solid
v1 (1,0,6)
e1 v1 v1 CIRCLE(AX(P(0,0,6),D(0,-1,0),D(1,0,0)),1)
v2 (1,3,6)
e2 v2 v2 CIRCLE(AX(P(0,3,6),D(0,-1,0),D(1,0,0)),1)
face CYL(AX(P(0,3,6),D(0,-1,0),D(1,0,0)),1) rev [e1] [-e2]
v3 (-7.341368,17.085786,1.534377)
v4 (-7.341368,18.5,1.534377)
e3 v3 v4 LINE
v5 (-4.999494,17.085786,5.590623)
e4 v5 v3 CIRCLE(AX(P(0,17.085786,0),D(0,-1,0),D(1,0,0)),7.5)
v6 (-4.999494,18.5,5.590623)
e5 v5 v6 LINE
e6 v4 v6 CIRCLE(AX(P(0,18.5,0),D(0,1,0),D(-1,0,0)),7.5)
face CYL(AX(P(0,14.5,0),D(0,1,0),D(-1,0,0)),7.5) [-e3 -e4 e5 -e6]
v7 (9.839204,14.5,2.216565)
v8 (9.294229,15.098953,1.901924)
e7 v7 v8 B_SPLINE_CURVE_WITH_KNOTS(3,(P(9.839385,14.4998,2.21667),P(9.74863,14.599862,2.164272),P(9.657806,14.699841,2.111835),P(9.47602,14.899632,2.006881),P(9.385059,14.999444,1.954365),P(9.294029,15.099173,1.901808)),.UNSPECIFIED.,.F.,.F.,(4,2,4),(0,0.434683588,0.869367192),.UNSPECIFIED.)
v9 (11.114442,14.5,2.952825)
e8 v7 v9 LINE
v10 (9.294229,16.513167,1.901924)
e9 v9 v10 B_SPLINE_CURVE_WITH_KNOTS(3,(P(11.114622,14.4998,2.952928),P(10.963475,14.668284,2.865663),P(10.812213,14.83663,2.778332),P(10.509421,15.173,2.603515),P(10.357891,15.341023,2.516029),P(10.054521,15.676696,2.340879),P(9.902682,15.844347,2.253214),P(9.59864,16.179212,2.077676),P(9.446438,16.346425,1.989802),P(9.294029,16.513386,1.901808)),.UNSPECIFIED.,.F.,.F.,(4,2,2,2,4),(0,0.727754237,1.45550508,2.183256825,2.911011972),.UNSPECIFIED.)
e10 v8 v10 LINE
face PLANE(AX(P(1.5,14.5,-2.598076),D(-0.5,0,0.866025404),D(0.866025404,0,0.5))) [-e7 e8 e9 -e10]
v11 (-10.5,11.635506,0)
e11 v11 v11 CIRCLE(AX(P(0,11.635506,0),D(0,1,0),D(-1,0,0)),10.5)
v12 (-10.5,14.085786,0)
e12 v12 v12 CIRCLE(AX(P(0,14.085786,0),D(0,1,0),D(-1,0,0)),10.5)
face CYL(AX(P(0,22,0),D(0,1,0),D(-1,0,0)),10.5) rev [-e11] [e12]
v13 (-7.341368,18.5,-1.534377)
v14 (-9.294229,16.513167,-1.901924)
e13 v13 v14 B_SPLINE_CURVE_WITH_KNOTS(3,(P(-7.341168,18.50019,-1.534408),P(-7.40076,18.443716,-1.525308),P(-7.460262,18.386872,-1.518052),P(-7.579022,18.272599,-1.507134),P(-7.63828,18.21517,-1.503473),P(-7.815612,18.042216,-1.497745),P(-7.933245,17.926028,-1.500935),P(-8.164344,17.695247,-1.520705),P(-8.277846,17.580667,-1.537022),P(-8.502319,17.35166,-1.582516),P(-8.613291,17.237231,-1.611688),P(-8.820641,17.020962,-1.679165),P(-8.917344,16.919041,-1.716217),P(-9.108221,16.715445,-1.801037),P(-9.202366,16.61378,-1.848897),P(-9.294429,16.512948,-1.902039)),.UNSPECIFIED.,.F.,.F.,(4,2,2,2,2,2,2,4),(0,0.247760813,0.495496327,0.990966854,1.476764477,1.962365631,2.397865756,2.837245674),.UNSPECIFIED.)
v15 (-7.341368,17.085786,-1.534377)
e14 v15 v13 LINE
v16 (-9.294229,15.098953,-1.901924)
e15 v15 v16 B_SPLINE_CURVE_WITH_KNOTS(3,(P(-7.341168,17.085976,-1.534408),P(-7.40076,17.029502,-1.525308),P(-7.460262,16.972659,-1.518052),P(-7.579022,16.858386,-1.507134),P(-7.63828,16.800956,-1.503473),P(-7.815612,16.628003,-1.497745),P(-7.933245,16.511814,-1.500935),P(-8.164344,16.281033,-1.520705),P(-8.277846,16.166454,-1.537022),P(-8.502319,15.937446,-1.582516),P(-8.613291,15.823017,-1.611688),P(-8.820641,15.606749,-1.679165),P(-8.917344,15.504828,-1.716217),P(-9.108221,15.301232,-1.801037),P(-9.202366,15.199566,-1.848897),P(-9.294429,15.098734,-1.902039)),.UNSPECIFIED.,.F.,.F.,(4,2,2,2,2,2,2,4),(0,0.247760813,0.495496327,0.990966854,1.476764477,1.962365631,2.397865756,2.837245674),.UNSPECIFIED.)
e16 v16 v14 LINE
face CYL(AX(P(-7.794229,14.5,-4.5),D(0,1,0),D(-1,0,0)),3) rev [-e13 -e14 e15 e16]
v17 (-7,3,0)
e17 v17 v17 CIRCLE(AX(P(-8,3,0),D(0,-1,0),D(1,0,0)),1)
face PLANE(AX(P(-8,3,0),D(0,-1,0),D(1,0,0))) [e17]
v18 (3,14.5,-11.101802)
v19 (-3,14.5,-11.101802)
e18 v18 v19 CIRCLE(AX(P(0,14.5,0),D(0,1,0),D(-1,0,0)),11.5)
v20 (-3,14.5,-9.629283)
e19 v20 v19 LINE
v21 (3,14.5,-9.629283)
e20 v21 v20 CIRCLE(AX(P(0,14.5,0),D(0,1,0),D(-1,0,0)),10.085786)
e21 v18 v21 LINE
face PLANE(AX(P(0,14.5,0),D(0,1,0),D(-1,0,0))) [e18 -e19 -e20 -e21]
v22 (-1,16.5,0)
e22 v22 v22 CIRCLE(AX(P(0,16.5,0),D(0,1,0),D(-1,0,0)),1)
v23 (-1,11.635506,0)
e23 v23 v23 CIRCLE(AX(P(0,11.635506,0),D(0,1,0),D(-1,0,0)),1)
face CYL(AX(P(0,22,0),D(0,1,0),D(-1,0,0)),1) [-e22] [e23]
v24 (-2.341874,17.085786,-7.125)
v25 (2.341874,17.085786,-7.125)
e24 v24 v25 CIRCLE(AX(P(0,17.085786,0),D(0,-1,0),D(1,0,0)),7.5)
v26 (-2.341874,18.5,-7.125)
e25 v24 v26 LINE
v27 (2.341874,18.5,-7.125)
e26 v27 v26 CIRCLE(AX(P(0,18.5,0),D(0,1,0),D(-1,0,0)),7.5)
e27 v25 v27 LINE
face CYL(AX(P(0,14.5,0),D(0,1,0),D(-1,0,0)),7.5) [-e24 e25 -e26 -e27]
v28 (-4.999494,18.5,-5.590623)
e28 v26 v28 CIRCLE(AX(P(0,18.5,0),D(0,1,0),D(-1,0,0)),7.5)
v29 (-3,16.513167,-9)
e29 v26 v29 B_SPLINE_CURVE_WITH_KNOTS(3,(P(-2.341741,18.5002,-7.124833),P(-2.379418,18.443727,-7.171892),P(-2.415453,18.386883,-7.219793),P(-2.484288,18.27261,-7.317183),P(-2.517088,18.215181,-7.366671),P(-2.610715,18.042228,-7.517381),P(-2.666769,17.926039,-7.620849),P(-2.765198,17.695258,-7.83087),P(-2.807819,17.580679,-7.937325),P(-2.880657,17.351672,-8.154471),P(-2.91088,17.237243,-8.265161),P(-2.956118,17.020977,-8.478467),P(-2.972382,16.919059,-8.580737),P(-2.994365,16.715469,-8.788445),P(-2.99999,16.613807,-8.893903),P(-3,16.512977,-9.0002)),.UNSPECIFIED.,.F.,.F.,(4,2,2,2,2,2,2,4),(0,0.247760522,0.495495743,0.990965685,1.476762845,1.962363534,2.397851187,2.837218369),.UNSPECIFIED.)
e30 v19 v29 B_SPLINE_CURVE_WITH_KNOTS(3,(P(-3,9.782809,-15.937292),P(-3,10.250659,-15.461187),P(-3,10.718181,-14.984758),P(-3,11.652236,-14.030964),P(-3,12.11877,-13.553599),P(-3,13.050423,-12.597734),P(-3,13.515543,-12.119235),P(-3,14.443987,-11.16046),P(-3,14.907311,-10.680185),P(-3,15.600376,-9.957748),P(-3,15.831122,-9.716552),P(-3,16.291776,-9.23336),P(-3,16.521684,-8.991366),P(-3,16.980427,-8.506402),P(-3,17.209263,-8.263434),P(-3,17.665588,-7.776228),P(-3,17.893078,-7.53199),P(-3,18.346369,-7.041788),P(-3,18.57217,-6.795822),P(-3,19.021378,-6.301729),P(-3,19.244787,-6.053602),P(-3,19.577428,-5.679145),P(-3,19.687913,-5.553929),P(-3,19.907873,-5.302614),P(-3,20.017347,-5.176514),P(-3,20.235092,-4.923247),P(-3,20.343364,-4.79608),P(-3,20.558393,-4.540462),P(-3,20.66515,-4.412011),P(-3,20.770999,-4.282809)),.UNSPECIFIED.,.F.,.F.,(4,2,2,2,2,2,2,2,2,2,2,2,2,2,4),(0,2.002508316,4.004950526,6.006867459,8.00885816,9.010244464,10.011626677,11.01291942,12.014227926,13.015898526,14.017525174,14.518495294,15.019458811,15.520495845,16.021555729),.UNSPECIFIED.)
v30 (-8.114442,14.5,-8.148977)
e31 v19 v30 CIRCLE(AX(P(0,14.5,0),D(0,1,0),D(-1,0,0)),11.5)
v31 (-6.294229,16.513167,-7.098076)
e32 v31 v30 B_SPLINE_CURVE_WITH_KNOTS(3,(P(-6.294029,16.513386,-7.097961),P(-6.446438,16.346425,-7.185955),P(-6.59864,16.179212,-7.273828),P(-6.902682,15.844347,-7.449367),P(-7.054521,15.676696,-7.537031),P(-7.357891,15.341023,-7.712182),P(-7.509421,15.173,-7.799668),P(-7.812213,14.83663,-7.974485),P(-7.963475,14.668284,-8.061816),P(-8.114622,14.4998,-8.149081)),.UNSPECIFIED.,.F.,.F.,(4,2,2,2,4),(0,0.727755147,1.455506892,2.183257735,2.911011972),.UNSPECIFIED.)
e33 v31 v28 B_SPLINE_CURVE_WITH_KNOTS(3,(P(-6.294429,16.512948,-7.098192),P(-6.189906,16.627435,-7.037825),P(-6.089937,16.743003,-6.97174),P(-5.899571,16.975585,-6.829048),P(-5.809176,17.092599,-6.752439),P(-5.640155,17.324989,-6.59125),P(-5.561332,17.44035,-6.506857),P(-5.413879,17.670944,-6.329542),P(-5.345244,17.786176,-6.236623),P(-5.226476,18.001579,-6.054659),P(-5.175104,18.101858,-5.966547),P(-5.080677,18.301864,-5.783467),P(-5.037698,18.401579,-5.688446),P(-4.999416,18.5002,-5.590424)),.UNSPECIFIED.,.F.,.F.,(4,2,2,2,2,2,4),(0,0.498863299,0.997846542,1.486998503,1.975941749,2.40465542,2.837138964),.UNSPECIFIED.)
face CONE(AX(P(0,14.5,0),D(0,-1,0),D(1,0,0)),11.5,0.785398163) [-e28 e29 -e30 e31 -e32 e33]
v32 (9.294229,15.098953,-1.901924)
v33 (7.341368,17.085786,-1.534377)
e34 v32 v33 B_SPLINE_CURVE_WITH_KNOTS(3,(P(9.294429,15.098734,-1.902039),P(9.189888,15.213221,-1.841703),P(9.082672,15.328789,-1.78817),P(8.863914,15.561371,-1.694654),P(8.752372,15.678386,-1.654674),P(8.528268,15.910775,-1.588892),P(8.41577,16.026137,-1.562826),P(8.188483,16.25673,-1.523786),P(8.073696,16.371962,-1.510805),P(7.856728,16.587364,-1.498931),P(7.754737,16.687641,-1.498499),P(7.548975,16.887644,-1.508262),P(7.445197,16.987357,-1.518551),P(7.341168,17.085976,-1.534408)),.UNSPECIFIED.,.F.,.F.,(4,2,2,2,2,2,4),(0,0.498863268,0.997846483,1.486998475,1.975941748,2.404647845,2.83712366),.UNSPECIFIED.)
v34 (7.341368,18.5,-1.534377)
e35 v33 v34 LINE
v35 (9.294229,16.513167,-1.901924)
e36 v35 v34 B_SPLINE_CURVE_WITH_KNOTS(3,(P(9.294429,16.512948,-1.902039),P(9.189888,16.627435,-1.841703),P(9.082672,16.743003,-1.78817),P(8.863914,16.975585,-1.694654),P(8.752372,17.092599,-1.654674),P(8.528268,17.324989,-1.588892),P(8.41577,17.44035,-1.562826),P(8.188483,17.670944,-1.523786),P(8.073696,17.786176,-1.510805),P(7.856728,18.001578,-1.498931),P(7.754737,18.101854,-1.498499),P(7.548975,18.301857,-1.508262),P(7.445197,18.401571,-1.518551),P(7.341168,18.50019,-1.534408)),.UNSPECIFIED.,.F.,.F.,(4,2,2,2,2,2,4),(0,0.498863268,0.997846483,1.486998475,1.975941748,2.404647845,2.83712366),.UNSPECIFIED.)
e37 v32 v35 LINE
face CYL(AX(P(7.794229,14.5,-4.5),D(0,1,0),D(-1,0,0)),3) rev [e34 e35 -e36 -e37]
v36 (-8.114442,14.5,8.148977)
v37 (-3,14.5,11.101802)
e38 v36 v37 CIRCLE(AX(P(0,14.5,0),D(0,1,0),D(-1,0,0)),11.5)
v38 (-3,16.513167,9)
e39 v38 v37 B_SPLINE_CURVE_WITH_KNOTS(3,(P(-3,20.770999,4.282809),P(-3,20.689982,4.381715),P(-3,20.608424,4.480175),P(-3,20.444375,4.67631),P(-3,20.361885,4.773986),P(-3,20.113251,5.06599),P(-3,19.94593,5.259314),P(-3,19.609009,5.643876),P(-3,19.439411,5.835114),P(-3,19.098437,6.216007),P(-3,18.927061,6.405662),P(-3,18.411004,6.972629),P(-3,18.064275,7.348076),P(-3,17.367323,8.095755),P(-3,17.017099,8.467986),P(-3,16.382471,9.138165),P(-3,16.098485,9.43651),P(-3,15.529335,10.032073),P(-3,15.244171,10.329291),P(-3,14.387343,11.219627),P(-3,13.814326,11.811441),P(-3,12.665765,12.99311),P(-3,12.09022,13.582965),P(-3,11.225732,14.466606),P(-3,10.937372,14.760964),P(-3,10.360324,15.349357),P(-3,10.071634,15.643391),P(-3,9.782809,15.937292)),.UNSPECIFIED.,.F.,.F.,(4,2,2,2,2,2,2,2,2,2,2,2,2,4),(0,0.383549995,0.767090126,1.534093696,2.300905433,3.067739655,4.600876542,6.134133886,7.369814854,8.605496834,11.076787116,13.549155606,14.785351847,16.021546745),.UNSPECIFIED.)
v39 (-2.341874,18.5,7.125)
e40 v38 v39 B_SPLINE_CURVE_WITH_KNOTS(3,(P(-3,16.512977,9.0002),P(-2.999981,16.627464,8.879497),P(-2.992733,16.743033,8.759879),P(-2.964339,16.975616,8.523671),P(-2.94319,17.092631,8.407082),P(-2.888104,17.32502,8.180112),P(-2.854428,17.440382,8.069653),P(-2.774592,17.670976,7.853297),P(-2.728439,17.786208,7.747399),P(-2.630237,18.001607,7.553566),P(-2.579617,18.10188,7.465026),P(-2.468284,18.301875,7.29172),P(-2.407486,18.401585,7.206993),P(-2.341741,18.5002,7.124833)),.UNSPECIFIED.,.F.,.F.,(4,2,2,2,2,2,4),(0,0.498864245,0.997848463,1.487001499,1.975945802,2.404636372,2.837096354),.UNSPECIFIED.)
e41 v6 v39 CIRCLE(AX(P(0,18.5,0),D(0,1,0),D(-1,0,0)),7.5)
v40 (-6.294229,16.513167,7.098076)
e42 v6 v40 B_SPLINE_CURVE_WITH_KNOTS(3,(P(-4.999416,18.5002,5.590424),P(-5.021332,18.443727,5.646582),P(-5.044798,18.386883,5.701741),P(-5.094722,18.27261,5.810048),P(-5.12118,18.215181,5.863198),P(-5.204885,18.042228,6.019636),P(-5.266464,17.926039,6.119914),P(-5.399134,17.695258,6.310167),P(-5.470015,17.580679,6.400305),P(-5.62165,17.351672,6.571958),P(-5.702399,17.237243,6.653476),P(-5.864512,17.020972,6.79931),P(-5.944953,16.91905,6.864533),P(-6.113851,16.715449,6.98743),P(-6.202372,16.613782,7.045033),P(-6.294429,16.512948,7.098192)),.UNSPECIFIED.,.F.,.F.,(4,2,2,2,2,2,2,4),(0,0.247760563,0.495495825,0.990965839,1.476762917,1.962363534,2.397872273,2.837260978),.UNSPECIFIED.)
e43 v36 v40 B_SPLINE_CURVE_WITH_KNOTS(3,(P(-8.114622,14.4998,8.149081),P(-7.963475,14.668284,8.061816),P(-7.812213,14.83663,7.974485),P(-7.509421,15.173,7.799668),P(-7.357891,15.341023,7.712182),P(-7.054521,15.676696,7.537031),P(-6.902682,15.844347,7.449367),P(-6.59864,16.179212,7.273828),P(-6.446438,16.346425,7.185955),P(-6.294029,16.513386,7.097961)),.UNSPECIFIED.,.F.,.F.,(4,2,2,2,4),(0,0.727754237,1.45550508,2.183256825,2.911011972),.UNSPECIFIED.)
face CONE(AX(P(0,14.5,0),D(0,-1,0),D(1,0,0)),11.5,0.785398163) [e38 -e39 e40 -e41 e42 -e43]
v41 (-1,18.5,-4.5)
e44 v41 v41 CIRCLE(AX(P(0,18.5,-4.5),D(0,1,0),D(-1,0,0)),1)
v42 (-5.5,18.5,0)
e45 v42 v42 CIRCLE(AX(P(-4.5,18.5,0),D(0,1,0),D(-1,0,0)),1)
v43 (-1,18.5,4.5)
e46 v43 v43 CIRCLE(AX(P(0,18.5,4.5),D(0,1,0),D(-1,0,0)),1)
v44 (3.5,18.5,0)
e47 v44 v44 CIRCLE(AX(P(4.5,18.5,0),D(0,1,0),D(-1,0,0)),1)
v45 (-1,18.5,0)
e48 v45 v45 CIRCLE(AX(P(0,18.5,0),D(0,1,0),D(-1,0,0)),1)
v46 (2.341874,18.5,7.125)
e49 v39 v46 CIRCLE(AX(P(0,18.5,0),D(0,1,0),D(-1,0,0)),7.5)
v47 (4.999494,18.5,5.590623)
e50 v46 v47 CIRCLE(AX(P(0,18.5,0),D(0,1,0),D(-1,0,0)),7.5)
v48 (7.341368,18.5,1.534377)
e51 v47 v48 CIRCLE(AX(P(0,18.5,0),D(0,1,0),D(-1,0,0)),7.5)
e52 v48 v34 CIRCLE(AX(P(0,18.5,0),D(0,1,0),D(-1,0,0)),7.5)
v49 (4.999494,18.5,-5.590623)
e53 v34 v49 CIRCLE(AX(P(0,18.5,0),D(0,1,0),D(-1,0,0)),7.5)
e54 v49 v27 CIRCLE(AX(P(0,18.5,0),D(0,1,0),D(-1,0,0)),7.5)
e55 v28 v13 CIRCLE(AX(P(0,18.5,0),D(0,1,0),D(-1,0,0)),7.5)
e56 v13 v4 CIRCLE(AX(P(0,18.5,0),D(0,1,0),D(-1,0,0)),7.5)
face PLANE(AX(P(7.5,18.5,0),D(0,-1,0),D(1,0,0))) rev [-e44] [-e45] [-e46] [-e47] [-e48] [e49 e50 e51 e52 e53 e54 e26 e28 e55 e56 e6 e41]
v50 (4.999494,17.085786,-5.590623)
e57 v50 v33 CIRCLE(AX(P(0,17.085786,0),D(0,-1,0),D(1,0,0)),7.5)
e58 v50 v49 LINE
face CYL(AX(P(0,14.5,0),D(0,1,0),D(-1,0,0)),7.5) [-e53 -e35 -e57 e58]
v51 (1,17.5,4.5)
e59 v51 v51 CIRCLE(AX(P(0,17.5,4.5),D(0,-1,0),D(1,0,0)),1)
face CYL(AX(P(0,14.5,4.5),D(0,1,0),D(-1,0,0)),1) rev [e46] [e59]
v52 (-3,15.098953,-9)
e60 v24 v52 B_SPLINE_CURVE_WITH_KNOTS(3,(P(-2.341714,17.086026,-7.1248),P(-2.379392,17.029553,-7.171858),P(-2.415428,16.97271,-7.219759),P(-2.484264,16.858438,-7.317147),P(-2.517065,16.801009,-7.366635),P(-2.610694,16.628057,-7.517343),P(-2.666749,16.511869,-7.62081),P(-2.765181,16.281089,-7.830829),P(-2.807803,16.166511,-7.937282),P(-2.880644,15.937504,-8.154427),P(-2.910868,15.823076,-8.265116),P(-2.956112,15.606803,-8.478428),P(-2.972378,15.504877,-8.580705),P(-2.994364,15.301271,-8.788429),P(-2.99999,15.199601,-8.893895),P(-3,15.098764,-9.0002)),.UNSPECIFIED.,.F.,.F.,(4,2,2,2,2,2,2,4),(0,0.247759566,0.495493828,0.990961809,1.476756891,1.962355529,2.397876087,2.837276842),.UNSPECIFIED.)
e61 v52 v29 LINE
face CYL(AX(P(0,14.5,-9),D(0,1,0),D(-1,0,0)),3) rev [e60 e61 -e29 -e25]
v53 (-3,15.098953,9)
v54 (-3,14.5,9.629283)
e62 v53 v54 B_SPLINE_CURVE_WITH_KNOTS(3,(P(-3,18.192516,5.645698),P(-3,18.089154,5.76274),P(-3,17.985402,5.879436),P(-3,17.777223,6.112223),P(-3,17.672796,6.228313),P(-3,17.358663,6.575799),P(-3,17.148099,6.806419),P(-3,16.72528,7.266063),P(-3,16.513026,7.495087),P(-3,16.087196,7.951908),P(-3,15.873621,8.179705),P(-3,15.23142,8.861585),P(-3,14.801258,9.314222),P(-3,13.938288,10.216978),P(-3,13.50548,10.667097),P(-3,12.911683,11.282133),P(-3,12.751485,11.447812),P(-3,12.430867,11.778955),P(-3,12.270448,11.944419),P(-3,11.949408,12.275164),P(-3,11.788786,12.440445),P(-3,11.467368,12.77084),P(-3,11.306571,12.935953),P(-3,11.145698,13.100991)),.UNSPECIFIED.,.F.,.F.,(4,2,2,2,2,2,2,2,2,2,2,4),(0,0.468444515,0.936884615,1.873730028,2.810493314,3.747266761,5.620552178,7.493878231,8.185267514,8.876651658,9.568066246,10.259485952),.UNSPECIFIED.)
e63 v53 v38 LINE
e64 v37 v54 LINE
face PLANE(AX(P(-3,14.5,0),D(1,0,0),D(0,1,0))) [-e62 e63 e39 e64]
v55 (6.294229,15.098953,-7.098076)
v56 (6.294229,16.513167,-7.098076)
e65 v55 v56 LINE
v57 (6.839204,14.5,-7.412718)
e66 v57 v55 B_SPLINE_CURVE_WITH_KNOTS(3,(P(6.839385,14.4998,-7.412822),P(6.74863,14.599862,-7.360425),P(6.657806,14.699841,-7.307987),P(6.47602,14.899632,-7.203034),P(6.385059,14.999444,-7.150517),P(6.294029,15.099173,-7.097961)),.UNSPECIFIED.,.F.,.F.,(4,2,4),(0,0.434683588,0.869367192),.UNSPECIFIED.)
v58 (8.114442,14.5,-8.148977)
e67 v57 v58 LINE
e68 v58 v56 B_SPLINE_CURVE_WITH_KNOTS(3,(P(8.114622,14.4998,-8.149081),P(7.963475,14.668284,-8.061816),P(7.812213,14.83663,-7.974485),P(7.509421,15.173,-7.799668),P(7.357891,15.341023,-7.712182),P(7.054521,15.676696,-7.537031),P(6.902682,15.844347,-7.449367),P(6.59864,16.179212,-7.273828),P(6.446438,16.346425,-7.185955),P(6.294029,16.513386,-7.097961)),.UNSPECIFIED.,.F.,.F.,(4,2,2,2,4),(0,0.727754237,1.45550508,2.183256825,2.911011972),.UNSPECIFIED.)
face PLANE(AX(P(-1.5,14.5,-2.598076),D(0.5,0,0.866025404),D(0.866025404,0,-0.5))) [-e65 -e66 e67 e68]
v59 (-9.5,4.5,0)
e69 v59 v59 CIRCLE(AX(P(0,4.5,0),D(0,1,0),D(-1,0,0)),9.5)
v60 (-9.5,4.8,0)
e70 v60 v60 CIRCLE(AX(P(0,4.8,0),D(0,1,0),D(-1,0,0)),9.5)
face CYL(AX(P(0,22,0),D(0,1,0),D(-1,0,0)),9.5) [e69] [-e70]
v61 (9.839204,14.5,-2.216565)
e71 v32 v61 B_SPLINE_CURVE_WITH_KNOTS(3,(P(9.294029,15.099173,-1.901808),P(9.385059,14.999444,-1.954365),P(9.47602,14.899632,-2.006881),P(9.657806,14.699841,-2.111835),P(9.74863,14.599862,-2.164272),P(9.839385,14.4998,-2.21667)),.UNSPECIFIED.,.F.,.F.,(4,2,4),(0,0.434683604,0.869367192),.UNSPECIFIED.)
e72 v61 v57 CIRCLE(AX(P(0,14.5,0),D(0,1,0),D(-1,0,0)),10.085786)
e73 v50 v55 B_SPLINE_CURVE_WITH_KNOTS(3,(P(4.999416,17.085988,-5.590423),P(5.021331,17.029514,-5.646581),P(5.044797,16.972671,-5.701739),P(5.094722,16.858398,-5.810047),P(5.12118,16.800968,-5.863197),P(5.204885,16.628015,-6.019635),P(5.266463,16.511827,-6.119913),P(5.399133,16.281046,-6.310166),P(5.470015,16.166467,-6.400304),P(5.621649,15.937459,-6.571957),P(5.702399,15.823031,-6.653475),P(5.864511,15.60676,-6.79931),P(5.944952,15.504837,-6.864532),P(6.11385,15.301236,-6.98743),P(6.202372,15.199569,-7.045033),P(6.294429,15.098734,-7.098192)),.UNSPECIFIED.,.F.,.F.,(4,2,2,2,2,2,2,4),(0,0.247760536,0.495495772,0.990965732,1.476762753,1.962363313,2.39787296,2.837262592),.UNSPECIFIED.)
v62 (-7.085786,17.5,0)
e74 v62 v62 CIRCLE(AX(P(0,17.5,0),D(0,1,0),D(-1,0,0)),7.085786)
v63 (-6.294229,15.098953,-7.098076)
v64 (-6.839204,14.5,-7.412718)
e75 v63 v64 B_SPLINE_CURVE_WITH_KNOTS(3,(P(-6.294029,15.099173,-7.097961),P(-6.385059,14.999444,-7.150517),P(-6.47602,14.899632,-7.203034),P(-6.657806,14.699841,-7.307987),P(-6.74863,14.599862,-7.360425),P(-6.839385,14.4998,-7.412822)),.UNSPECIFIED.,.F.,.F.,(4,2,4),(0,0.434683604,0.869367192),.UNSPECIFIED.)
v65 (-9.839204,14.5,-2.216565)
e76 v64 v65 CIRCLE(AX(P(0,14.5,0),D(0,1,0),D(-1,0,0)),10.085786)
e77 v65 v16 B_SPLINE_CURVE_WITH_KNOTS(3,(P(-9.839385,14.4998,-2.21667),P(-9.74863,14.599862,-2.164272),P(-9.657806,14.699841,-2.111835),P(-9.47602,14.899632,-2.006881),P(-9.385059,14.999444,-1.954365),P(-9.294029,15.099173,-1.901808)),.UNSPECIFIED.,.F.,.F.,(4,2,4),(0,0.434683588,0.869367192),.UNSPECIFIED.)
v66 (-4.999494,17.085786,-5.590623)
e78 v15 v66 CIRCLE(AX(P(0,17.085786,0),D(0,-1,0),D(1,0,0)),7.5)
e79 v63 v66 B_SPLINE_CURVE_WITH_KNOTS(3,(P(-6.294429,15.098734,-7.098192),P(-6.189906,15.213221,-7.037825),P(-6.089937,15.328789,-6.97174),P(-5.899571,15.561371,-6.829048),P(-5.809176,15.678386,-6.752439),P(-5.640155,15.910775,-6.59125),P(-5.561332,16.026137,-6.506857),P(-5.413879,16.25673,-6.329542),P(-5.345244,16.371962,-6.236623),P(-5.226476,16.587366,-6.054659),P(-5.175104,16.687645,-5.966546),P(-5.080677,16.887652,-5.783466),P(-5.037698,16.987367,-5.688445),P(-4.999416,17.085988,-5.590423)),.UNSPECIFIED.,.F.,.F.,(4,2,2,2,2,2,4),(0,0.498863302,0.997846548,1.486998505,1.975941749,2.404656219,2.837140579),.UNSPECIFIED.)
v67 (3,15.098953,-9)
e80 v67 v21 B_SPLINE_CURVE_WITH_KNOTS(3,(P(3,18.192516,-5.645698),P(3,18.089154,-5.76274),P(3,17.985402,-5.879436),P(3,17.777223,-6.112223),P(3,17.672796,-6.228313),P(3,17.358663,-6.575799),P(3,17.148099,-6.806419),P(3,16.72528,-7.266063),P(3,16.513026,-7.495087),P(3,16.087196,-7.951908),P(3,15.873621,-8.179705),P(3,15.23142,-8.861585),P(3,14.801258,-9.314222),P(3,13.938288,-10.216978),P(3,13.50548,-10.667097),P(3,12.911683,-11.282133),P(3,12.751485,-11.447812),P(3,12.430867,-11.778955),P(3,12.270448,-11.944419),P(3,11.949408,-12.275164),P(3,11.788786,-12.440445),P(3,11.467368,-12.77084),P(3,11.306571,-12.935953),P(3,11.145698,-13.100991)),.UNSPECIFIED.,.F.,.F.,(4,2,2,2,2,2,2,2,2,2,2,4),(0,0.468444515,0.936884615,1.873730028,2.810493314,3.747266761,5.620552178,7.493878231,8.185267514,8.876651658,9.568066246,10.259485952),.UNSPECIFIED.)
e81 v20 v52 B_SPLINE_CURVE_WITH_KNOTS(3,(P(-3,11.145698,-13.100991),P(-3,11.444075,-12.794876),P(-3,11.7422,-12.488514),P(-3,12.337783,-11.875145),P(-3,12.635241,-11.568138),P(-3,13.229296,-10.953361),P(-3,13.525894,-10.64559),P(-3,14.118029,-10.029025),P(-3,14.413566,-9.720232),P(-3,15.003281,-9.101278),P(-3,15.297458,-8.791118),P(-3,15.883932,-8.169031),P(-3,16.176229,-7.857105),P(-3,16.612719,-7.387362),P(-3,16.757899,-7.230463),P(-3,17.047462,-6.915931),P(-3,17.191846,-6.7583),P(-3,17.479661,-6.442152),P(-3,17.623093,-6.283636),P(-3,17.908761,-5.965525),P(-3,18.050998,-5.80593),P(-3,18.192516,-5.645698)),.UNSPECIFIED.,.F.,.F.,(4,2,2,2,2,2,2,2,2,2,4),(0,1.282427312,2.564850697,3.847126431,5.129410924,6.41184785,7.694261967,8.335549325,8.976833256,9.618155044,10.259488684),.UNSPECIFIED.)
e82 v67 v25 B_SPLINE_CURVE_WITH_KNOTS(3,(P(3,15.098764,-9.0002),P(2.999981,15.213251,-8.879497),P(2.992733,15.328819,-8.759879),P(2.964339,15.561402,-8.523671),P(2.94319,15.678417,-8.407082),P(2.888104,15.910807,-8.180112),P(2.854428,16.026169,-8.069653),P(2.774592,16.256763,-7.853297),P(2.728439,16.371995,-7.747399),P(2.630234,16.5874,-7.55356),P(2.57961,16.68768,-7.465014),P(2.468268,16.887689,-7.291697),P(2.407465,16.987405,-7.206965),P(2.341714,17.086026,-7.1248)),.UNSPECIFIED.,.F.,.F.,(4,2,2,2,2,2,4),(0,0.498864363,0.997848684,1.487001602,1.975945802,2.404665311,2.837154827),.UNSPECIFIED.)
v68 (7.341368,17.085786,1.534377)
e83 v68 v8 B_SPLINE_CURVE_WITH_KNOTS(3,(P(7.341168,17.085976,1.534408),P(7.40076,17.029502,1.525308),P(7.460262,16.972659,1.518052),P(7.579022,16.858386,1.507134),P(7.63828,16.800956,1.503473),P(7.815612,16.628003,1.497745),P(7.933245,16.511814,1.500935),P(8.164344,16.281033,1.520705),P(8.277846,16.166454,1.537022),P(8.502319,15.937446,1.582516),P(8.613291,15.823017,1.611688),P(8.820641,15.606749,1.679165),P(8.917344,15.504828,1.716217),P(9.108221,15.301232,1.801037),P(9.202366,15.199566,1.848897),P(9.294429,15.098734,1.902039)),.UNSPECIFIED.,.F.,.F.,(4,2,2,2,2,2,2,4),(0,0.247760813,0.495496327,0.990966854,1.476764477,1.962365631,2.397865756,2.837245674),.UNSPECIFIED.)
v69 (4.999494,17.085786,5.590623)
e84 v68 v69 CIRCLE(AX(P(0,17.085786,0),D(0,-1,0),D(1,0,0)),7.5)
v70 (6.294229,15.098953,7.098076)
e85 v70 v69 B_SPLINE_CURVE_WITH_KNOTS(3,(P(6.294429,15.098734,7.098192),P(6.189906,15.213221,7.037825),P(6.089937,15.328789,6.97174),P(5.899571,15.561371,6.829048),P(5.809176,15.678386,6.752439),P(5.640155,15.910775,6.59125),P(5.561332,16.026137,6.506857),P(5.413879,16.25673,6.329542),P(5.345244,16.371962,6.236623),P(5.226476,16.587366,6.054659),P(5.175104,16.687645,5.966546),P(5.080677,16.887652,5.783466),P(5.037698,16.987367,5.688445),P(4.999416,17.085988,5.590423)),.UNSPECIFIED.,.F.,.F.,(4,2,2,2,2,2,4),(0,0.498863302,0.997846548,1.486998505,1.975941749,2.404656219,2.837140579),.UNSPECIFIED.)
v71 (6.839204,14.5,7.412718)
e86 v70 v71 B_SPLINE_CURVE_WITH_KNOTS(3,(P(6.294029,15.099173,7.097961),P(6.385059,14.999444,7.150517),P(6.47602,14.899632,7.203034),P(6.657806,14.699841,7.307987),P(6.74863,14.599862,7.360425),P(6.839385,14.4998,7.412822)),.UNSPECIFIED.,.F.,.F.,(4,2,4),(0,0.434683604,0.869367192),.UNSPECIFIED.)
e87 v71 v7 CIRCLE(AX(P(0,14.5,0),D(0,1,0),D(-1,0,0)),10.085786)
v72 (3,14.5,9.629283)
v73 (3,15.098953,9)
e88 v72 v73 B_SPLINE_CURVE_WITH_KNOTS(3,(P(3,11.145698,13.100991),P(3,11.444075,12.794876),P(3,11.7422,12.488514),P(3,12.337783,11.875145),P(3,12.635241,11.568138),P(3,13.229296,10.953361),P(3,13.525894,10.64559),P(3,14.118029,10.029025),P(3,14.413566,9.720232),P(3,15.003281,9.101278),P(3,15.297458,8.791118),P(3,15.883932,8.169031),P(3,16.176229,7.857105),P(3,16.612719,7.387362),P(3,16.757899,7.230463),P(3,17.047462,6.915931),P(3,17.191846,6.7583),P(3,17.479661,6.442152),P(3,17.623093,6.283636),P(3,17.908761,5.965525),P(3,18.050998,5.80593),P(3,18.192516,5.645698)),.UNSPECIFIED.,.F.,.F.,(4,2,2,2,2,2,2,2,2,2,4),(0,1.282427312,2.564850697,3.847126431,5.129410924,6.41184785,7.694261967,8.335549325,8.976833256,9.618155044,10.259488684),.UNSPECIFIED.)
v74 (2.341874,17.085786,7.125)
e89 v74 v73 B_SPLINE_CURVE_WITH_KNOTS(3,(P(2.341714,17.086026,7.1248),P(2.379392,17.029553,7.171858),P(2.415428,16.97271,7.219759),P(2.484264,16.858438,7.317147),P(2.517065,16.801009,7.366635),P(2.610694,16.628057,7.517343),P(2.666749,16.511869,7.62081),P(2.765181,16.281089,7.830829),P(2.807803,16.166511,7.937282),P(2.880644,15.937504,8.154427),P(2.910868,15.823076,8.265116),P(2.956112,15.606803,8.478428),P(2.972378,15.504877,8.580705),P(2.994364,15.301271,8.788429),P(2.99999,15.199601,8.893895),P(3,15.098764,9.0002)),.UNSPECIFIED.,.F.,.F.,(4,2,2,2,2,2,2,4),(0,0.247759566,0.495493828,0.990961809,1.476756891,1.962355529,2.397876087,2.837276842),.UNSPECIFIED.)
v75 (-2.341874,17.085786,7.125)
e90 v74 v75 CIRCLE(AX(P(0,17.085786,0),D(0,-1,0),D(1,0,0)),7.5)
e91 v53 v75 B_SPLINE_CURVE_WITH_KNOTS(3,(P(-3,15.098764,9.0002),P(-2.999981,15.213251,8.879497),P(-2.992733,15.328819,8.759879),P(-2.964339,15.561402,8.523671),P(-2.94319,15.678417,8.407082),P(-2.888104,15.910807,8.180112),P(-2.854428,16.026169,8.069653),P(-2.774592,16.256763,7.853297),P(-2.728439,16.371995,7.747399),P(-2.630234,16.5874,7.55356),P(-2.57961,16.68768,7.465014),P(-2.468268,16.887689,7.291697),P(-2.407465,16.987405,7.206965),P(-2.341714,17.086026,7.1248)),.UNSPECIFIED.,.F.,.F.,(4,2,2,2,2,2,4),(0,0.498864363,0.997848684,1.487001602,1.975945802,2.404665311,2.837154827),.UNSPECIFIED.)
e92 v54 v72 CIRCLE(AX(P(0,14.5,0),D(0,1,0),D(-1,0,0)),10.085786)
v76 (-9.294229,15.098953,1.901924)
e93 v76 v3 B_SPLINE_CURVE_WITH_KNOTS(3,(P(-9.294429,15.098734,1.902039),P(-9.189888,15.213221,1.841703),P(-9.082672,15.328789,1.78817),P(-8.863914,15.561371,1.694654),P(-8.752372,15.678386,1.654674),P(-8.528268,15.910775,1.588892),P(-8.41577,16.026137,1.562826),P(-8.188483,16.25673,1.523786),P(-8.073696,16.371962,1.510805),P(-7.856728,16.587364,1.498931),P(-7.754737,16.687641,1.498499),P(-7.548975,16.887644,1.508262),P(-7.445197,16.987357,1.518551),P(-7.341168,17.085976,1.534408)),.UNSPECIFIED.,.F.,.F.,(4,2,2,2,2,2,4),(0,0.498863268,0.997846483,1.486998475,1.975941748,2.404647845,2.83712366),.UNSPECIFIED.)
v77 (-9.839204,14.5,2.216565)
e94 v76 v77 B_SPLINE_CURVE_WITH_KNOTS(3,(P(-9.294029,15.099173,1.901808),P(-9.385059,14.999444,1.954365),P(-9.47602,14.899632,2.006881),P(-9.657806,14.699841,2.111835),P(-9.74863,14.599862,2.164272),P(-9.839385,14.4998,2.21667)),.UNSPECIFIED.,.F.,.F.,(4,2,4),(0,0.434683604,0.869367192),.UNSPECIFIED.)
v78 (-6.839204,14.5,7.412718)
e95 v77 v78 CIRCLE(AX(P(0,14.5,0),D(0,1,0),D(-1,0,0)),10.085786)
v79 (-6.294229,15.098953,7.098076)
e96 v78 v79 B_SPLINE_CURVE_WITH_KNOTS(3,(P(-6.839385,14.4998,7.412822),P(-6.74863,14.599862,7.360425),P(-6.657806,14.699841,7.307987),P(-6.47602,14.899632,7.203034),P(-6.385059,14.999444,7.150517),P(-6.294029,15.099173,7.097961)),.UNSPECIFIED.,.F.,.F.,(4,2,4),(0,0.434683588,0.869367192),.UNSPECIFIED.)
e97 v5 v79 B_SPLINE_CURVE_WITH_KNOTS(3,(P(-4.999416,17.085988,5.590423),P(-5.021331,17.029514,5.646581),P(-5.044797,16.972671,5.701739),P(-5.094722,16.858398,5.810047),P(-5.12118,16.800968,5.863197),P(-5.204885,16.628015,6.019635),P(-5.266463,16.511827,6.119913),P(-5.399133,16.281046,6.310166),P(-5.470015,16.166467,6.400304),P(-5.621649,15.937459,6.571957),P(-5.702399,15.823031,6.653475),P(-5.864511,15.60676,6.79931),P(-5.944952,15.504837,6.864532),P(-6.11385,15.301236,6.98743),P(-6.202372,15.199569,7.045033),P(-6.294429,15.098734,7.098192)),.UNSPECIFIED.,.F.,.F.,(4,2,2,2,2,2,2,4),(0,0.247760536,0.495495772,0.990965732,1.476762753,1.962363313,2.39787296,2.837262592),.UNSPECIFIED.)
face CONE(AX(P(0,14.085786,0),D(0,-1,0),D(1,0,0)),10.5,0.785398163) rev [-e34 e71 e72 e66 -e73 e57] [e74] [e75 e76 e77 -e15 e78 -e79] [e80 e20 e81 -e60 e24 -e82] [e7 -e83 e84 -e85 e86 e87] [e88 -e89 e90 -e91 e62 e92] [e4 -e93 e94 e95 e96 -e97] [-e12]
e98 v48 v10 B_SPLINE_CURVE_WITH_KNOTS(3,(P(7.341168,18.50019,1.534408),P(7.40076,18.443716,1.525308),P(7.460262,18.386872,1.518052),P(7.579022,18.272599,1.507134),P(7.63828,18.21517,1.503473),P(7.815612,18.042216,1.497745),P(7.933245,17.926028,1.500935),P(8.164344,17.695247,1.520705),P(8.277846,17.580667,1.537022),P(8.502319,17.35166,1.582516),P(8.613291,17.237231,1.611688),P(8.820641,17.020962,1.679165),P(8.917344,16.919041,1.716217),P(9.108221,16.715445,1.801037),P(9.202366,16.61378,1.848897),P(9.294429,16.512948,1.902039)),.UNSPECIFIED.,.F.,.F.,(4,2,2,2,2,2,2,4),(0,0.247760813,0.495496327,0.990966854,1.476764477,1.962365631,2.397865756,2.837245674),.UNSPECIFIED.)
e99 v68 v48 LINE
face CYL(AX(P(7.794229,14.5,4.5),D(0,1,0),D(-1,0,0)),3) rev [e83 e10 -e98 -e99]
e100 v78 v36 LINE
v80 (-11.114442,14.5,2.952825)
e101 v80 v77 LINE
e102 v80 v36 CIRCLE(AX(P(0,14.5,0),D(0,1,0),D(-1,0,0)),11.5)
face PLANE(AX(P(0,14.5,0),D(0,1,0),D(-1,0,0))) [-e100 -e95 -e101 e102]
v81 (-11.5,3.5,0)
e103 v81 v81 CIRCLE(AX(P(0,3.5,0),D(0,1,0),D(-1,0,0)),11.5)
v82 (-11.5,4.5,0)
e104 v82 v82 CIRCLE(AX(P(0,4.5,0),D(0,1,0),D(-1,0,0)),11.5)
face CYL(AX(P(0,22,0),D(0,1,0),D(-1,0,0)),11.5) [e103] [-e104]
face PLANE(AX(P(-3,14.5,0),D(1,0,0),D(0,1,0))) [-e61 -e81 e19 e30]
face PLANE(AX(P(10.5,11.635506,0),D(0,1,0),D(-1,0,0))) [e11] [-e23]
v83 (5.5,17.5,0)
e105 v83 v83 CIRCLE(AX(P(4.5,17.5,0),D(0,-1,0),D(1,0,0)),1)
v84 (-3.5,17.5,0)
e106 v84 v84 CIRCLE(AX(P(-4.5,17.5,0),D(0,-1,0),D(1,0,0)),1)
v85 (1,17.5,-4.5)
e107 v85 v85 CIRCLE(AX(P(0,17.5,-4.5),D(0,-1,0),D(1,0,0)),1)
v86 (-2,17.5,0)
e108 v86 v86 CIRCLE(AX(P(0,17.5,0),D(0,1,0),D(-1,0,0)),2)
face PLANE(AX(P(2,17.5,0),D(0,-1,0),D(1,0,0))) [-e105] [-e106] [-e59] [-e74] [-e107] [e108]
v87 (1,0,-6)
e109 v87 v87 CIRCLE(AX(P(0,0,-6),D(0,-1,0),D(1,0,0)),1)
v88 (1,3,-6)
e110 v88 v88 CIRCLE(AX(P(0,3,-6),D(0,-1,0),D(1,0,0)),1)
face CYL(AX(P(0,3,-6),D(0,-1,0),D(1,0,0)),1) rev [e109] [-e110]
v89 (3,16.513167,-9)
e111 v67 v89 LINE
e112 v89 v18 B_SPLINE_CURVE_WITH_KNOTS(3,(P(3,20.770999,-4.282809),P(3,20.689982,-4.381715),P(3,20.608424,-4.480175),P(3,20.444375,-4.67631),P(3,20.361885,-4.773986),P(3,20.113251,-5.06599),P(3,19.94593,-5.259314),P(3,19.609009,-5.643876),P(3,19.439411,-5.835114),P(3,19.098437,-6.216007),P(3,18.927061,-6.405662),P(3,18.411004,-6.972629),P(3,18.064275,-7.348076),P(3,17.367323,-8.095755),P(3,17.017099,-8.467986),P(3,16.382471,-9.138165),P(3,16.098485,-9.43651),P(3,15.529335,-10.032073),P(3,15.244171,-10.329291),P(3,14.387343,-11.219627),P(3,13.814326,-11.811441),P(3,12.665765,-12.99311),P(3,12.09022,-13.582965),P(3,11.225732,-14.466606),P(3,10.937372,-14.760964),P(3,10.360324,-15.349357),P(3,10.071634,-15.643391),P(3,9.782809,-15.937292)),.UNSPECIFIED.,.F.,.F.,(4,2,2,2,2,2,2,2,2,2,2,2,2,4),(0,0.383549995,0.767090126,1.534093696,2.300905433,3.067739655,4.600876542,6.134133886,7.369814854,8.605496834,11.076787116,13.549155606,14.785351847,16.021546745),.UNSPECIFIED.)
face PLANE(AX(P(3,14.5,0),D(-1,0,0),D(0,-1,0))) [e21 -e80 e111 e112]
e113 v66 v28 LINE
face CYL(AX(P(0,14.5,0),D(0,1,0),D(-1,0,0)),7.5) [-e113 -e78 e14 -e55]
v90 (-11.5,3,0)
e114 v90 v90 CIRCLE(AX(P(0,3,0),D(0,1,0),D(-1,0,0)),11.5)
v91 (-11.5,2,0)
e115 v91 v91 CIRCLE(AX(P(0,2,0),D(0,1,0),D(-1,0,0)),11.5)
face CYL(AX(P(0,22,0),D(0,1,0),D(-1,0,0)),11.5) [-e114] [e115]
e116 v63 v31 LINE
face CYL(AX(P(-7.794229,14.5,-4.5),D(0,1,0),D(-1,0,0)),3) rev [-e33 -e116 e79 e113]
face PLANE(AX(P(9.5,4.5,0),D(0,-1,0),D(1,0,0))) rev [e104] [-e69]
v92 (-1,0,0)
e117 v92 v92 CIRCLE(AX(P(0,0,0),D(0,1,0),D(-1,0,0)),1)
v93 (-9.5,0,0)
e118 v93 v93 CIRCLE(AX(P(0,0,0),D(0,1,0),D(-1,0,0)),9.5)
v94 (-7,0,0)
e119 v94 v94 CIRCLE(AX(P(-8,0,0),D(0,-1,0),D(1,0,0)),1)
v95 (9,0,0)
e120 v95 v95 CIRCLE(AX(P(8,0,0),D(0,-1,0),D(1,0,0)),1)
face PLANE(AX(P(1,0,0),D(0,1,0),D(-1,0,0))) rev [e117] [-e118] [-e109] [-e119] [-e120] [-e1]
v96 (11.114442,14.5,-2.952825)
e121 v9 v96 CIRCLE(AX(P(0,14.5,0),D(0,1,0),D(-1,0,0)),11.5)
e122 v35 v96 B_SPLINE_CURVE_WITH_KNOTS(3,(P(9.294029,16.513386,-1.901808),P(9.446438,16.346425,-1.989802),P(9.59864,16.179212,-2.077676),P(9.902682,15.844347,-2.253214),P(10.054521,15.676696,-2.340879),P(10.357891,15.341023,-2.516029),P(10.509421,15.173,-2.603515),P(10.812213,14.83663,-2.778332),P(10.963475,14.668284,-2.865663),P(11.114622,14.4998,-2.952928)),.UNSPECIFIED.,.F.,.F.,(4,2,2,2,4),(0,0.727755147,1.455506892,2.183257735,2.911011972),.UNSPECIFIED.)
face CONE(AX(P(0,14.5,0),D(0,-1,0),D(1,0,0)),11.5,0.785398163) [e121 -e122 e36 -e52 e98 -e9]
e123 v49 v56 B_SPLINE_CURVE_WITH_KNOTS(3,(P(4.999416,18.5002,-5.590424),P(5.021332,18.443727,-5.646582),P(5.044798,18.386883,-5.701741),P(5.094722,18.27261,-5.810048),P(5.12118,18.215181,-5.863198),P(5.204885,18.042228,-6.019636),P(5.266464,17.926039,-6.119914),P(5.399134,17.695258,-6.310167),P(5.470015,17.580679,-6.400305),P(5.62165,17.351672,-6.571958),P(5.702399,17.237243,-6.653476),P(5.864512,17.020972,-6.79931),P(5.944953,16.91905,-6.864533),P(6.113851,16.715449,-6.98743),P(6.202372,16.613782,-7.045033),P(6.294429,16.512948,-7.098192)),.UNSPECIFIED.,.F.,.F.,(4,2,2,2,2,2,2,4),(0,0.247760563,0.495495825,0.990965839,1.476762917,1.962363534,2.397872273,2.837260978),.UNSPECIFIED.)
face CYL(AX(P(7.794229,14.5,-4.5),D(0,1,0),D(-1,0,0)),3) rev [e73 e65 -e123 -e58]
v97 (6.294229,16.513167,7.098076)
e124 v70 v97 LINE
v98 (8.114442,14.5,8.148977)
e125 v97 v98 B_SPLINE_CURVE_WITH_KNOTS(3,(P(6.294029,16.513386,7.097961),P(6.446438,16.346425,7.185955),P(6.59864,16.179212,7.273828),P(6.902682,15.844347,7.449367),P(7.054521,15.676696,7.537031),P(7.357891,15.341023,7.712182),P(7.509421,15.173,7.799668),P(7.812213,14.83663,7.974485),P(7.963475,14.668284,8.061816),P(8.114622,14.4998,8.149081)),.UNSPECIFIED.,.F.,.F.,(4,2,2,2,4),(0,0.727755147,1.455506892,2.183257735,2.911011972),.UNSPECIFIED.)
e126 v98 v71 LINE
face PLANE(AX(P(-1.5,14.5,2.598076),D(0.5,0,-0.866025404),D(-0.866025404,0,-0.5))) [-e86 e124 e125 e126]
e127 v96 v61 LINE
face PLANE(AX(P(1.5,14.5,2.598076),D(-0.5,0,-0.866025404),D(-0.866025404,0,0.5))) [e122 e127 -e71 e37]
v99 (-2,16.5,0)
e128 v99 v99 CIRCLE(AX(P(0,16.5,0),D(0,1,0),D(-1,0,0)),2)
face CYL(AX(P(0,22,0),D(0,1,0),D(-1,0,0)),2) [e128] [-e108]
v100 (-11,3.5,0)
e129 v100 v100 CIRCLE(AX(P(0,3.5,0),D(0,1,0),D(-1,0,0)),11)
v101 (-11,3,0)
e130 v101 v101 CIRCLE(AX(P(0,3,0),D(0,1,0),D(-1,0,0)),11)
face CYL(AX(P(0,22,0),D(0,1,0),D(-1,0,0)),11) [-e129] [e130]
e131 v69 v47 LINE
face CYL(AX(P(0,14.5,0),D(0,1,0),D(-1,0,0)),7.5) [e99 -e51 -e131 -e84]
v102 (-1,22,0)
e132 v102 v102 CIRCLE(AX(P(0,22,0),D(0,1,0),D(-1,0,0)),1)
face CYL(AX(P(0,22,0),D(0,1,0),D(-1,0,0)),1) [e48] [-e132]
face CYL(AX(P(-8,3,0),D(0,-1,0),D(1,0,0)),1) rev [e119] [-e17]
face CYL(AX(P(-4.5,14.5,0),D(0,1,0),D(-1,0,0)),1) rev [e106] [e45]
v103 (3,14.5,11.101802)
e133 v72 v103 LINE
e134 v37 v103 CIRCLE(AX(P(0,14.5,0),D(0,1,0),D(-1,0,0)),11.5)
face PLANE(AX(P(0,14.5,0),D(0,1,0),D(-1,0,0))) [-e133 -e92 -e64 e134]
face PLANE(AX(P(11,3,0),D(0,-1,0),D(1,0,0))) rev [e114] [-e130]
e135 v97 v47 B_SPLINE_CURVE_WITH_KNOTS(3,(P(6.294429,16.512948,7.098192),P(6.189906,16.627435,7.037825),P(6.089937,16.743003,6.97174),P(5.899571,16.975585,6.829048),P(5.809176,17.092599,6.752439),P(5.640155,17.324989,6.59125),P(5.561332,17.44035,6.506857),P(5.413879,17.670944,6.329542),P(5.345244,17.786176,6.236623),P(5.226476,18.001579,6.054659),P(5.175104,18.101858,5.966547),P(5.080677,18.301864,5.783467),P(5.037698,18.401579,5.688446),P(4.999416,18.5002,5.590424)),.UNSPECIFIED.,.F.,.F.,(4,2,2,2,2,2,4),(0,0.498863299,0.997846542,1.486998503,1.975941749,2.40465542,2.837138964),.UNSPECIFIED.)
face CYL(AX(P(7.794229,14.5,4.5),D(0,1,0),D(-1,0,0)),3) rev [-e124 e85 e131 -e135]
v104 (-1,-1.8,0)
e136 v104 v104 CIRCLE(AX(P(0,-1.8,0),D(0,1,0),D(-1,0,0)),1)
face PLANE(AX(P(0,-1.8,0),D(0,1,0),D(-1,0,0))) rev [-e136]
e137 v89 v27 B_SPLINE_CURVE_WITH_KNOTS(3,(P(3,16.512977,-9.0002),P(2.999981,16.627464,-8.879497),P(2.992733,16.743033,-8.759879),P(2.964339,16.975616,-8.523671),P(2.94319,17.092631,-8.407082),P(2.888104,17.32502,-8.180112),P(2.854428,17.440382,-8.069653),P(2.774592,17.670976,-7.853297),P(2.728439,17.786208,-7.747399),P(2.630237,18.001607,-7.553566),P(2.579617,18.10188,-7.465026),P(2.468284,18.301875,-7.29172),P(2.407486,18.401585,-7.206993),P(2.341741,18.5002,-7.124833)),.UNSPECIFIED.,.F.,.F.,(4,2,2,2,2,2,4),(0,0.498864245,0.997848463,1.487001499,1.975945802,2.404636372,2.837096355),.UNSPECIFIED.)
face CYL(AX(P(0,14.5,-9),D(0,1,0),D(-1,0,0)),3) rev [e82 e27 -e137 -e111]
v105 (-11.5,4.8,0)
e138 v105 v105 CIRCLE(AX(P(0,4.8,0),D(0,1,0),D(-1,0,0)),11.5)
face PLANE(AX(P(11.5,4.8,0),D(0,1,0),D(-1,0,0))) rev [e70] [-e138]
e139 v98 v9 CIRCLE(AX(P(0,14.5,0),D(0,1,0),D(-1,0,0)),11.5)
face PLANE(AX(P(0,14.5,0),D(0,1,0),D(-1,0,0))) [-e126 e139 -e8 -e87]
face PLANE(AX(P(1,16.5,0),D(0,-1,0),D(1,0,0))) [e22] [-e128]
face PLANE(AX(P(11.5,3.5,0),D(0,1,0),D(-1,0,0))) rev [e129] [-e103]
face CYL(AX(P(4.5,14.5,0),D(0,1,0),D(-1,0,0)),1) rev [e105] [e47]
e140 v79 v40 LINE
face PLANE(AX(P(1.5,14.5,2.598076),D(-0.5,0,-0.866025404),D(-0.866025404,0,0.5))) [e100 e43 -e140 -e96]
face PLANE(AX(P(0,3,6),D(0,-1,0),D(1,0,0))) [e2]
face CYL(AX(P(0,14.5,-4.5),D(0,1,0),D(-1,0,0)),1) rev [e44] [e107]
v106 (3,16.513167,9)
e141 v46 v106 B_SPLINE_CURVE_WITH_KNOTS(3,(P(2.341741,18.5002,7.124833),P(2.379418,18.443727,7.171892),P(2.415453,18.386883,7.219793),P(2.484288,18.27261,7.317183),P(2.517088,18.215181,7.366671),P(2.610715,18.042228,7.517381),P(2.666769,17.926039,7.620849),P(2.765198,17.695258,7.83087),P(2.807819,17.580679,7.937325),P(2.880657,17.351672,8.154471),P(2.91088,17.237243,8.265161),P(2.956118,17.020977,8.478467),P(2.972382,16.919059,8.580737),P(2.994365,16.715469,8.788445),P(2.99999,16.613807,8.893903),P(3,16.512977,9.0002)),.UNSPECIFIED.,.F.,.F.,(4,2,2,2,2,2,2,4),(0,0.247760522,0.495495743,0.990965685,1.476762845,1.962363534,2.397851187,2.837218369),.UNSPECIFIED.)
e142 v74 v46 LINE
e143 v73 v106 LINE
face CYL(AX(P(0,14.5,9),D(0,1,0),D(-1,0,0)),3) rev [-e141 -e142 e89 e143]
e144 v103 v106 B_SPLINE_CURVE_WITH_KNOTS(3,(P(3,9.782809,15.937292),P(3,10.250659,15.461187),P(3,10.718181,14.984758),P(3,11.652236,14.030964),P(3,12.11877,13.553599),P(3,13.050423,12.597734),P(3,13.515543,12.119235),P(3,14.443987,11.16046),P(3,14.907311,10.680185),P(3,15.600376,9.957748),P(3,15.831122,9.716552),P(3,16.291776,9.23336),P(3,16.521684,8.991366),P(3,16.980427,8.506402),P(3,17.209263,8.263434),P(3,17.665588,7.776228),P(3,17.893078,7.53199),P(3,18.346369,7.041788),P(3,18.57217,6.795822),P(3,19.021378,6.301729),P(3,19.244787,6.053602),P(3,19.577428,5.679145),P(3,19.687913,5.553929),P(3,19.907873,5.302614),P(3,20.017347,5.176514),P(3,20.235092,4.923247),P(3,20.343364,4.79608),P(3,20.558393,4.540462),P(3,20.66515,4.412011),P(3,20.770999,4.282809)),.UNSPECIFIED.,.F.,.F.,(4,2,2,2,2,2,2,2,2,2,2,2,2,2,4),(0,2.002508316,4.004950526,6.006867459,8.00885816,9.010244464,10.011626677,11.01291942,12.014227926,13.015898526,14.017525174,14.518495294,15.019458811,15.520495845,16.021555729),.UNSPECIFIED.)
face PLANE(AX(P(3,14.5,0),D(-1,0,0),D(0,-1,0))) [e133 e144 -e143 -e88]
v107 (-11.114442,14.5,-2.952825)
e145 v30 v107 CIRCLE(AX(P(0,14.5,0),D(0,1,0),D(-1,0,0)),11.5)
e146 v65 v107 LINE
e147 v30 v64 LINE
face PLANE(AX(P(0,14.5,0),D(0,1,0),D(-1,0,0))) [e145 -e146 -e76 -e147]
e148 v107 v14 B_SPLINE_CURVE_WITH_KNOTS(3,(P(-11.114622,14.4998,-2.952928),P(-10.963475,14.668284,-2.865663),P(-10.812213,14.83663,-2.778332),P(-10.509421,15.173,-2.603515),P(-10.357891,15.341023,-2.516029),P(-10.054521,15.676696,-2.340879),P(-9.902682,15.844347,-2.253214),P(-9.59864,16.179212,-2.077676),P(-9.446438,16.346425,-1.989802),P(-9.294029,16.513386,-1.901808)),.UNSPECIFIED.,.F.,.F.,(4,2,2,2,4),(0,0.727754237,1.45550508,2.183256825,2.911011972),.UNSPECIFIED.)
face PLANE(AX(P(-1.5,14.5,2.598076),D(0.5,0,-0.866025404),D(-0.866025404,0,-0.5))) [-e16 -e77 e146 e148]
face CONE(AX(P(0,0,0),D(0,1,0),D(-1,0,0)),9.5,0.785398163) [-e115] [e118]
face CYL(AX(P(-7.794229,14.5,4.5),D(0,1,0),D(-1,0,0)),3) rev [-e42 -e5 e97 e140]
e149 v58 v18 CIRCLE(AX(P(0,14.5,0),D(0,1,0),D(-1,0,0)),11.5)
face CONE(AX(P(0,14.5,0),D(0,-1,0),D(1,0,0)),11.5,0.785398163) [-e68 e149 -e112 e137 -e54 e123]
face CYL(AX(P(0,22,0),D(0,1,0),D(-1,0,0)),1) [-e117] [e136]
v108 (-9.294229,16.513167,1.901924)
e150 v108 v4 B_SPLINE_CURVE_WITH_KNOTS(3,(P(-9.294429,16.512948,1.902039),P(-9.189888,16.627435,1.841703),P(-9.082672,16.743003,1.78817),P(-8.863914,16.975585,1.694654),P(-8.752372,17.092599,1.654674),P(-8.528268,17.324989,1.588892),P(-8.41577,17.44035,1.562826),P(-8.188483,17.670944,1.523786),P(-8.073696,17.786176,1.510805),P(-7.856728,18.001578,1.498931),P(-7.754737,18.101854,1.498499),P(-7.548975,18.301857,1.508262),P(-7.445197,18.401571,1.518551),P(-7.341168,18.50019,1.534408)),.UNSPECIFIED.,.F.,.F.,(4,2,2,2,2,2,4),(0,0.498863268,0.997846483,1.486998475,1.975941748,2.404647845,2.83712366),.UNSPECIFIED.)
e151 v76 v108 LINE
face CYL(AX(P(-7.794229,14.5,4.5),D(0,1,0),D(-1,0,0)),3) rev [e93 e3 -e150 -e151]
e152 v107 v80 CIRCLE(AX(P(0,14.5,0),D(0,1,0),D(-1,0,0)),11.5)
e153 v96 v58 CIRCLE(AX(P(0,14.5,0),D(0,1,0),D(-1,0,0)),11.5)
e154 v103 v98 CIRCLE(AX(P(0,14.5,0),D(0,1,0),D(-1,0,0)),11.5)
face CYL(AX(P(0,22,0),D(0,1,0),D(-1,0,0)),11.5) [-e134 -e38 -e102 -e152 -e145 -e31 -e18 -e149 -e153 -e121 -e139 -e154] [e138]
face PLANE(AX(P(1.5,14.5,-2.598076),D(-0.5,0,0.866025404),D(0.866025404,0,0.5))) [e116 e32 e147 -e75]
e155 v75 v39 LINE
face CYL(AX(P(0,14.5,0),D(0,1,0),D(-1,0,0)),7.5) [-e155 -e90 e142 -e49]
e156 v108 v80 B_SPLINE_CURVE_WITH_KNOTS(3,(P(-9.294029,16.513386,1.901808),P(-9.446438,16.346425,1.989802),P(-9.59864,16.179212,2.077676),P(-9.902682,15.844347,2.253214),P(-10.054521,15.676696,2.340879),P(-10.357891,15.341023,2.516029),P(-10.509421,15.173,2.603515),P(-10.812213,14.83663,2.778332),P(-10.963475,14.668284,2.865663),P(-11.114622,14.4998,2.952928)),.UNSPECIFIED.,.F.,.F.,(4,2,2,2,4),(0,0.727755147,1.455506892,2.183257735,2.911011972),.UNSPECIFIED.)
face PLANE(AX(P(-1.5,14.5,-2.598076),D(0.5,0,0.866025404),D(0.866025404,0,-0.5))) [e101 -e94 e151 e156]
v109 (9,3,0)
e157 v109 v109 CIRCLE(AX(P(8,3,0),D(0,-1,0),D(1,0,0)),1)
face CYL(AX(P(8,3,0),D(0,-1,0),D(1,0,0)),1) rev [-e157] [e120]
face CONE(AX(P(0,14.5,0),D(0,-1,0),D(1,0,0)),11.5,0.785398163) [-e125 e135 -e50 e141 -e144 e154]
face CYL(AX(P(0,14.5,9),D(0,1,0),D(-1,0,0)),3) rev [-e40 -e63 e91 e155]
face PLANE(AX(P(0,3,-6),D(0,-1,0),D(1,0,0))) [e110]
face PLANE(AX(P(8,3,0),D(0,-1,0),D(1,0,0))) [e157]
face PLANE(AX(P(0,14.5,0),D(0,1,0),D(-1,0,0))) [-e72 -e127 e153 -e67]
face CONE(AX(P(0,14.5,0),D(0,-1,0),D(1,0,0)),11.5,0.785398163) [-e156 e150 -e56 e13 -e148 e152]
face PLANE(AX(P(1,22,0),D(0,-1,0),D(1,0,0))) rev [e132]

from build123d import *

# Parameters (mm, degrees)
SKETCH2_R          = 1
CUT_EXTRUDE1_DEPTH = 4
SKETCH3_R          = 1
CUT_EXTRUDE2_DEPTH = 3


with BuildPart() as part:
    # Sketch1 → Revolve1 (revolve)
    with BuildSketch(Plane.XY):
        Polygon((0, 22), (0, -1.8), (1, -1.8), (1, 0), (9.5, 0), (11.5, 2), (11.5, 3), (11, 3), (11, 3.5), (11.5, 3.5), (11.5, 4.5), (9.5, 4.5), (9.5, 4.8), (11.5, 4.8), (11.5, 14.5), (7.5, 18.5), (1, 18.5), (1, 22), align=None)
        Polygon((2, 17.5), (7.085786438, 17.5), (10.5, 14.085786438), (10.5, 11.635505843), (1, 11.635505843), (1, 16.5), (2, 16.5), align=None, mode=Mode.SUBTRACT)
    revolve(axis=Axis((0, 22, 0), (0, -1, 0)))

    # Sketch2 → Cut-Extrude1 (cut)
    with BuildSketch(Plane(origin=(0, 18.5, 0), x_dir=(1, 0, 0), z_dir=(0, 1, 0))):
        with BuildLine():
            Line((-3, 14.723214578), (-3, 9))
            ThreePointArc((-3, 9), (-2.830690971, 8.006426336), (-2.341874249, 7.125))
            ThreePointArc((-2.341874249, 7.125), (0, 7.5), (2.341874249, 7.125))
            ThreePointArc((2.341874249, 7.125), (2.830690971, 8.006426336), (3, 9))
            Line((3, 9), (3, 14.723214578))
            Line((3, 14.723214578), (-3, 14.723214578))
        make_face()
        with BuildLine():
            ThreePointArc((-7.341368127, 1.534377408), (-6.495190528, 3.75), (-4.999493877, 5.590622592))
            ThreePointArc((-4.999493877, 5.590622592), (-5.518423115, 6.454663459), (-6.294228634, 7.098076211))
            Line((-6.294228634, 7.098076211), (-11.25067785, 9.9596835))
            Line((-11.25067785, 9.9596835), (-14.25067785, 4.763531077))
            Line((-14.25067785, 4.763531077), (-9.294228634, 1.901923789))
            ThreePointArc((-9.294228634, 1.901923789), (-8.349114086, 1.551762877), (-7.341368127, 1.534377408))
        make_face()
        with BuildLine():
            ThreePointArc((6.294228634, 7.098076211), (5.518423115, 6.454663459), (4.999493877, 5.590622592))
            ThreePointArc((4.999493877, 5.590622592), (6.495190528, 3.75), (7.341368127, 1.534377408))
            ThreePointArc((7.341368127, 1.534377408), (8.349114086, 1.551762877), (9.294228634, 1.901923789))
            Line((9.294228634, 1.901923789), (14.25067785, 4.763531077))
            Line((14.25067785, 4.763531077), (11.25067785, 9.9596835))
            Line((11.25067785, 9.9596835), (6.294228634, 7.098076211))
        make_face()
        with BuildLine():
            ThreePointArc((-4.999493877, -5.590622592), (-6.495190528, -3.75), (-7.341368127, -1.534377408))
            ThreePointArc((-7.341368127, -1.534377408), (-8.349114086, -1.551762877), (-9.294228634, -1.901923789))
            Line((-9.294228634, -1.901923789), (-14.25067785, -4.763531077))
            Line((-14.25067785, -4.763531077), (-11.25067785, -9.9596835))
            Line((-11.25067785, -9.9596835), (-6.294228634, -7.098076211))
            ThreePointArc((-6.294228634, -7.098076211), (-5.518423115, -6.454663459), (-4.999493877, -5.590622592))
        make_face()
        with BuildLine():
            ThreePointArc((9.294228634, -1.901923789), (8.349114086, -1.551762877), (7.341368127, -1.534377408))
            ThreePointArc((7.341368127, -1.534377408), (6.495190528, -3.75), (4.999493877, -5.590622592))
            ThreePointArc((4.999493877, -5.590622592), (5.518423115, -6.454663459), (6.294228634, -7.098076211))
            Line((6.294228634, -7.098076211), (11.25067785, -9.9596835))
            Line((11.25067785, -9.9596835), (14.25067785, -4.763531077))
            Line((14.25067785, -4.763531077), (9.294228634, -1.901923789))
        make_face()
        with BuildLine():
            ThreePointArc((2.341874249, -7.125), (0, -7.5), (-2.341874249, -7.125))
            ThreePointArc((-2.341874249, -7.125), (-2.830690971, -8.006426336), (-3, -9))
            Line((-3, -9), (-3, -14.723214578))
            Line((-3, -14.723214578), (3, -14.723214578))
            Line((3, -14.723214578), (3, -9))
            ThreePointArc((3, -9), (2.830690971, -8.006426336), (2.341874249, -7.125))
        make_face()
        with Locations((0, 4.5)):
            Circle(SKETCH2_R)
        with Locations((4.5, 0)):
            Circle(SKETCH2_R)
        with Locations((0, -4.5)):
            Circle(SKETCH2_R)
        with Locations((-4.5, 0)):
            Circle(SKETCH2_R)
    extrude(amount=-CUT_EXTRUDE1_DEPTH, mode=Mode.SUBTRACT)

    # Sketch3 → Cut-Extrude2 (cut)
    with BuildSketch(Plane.XZ):
        with Locations((0, 6)):
            Circle(SKETCH3_R)
        with Locations((0, -6)):
            Circle(SKETCH3_R)
        with Locations((8, 0)):
            Circle(SKETCH3_R)
        with Locations((-8, 0)):
            Circle(SKETCH3_R)
    extrude(amount=-CUT_EXTRUDE2_DEPTH, mode=Mode.SUBTRACT)


solid = part.part
